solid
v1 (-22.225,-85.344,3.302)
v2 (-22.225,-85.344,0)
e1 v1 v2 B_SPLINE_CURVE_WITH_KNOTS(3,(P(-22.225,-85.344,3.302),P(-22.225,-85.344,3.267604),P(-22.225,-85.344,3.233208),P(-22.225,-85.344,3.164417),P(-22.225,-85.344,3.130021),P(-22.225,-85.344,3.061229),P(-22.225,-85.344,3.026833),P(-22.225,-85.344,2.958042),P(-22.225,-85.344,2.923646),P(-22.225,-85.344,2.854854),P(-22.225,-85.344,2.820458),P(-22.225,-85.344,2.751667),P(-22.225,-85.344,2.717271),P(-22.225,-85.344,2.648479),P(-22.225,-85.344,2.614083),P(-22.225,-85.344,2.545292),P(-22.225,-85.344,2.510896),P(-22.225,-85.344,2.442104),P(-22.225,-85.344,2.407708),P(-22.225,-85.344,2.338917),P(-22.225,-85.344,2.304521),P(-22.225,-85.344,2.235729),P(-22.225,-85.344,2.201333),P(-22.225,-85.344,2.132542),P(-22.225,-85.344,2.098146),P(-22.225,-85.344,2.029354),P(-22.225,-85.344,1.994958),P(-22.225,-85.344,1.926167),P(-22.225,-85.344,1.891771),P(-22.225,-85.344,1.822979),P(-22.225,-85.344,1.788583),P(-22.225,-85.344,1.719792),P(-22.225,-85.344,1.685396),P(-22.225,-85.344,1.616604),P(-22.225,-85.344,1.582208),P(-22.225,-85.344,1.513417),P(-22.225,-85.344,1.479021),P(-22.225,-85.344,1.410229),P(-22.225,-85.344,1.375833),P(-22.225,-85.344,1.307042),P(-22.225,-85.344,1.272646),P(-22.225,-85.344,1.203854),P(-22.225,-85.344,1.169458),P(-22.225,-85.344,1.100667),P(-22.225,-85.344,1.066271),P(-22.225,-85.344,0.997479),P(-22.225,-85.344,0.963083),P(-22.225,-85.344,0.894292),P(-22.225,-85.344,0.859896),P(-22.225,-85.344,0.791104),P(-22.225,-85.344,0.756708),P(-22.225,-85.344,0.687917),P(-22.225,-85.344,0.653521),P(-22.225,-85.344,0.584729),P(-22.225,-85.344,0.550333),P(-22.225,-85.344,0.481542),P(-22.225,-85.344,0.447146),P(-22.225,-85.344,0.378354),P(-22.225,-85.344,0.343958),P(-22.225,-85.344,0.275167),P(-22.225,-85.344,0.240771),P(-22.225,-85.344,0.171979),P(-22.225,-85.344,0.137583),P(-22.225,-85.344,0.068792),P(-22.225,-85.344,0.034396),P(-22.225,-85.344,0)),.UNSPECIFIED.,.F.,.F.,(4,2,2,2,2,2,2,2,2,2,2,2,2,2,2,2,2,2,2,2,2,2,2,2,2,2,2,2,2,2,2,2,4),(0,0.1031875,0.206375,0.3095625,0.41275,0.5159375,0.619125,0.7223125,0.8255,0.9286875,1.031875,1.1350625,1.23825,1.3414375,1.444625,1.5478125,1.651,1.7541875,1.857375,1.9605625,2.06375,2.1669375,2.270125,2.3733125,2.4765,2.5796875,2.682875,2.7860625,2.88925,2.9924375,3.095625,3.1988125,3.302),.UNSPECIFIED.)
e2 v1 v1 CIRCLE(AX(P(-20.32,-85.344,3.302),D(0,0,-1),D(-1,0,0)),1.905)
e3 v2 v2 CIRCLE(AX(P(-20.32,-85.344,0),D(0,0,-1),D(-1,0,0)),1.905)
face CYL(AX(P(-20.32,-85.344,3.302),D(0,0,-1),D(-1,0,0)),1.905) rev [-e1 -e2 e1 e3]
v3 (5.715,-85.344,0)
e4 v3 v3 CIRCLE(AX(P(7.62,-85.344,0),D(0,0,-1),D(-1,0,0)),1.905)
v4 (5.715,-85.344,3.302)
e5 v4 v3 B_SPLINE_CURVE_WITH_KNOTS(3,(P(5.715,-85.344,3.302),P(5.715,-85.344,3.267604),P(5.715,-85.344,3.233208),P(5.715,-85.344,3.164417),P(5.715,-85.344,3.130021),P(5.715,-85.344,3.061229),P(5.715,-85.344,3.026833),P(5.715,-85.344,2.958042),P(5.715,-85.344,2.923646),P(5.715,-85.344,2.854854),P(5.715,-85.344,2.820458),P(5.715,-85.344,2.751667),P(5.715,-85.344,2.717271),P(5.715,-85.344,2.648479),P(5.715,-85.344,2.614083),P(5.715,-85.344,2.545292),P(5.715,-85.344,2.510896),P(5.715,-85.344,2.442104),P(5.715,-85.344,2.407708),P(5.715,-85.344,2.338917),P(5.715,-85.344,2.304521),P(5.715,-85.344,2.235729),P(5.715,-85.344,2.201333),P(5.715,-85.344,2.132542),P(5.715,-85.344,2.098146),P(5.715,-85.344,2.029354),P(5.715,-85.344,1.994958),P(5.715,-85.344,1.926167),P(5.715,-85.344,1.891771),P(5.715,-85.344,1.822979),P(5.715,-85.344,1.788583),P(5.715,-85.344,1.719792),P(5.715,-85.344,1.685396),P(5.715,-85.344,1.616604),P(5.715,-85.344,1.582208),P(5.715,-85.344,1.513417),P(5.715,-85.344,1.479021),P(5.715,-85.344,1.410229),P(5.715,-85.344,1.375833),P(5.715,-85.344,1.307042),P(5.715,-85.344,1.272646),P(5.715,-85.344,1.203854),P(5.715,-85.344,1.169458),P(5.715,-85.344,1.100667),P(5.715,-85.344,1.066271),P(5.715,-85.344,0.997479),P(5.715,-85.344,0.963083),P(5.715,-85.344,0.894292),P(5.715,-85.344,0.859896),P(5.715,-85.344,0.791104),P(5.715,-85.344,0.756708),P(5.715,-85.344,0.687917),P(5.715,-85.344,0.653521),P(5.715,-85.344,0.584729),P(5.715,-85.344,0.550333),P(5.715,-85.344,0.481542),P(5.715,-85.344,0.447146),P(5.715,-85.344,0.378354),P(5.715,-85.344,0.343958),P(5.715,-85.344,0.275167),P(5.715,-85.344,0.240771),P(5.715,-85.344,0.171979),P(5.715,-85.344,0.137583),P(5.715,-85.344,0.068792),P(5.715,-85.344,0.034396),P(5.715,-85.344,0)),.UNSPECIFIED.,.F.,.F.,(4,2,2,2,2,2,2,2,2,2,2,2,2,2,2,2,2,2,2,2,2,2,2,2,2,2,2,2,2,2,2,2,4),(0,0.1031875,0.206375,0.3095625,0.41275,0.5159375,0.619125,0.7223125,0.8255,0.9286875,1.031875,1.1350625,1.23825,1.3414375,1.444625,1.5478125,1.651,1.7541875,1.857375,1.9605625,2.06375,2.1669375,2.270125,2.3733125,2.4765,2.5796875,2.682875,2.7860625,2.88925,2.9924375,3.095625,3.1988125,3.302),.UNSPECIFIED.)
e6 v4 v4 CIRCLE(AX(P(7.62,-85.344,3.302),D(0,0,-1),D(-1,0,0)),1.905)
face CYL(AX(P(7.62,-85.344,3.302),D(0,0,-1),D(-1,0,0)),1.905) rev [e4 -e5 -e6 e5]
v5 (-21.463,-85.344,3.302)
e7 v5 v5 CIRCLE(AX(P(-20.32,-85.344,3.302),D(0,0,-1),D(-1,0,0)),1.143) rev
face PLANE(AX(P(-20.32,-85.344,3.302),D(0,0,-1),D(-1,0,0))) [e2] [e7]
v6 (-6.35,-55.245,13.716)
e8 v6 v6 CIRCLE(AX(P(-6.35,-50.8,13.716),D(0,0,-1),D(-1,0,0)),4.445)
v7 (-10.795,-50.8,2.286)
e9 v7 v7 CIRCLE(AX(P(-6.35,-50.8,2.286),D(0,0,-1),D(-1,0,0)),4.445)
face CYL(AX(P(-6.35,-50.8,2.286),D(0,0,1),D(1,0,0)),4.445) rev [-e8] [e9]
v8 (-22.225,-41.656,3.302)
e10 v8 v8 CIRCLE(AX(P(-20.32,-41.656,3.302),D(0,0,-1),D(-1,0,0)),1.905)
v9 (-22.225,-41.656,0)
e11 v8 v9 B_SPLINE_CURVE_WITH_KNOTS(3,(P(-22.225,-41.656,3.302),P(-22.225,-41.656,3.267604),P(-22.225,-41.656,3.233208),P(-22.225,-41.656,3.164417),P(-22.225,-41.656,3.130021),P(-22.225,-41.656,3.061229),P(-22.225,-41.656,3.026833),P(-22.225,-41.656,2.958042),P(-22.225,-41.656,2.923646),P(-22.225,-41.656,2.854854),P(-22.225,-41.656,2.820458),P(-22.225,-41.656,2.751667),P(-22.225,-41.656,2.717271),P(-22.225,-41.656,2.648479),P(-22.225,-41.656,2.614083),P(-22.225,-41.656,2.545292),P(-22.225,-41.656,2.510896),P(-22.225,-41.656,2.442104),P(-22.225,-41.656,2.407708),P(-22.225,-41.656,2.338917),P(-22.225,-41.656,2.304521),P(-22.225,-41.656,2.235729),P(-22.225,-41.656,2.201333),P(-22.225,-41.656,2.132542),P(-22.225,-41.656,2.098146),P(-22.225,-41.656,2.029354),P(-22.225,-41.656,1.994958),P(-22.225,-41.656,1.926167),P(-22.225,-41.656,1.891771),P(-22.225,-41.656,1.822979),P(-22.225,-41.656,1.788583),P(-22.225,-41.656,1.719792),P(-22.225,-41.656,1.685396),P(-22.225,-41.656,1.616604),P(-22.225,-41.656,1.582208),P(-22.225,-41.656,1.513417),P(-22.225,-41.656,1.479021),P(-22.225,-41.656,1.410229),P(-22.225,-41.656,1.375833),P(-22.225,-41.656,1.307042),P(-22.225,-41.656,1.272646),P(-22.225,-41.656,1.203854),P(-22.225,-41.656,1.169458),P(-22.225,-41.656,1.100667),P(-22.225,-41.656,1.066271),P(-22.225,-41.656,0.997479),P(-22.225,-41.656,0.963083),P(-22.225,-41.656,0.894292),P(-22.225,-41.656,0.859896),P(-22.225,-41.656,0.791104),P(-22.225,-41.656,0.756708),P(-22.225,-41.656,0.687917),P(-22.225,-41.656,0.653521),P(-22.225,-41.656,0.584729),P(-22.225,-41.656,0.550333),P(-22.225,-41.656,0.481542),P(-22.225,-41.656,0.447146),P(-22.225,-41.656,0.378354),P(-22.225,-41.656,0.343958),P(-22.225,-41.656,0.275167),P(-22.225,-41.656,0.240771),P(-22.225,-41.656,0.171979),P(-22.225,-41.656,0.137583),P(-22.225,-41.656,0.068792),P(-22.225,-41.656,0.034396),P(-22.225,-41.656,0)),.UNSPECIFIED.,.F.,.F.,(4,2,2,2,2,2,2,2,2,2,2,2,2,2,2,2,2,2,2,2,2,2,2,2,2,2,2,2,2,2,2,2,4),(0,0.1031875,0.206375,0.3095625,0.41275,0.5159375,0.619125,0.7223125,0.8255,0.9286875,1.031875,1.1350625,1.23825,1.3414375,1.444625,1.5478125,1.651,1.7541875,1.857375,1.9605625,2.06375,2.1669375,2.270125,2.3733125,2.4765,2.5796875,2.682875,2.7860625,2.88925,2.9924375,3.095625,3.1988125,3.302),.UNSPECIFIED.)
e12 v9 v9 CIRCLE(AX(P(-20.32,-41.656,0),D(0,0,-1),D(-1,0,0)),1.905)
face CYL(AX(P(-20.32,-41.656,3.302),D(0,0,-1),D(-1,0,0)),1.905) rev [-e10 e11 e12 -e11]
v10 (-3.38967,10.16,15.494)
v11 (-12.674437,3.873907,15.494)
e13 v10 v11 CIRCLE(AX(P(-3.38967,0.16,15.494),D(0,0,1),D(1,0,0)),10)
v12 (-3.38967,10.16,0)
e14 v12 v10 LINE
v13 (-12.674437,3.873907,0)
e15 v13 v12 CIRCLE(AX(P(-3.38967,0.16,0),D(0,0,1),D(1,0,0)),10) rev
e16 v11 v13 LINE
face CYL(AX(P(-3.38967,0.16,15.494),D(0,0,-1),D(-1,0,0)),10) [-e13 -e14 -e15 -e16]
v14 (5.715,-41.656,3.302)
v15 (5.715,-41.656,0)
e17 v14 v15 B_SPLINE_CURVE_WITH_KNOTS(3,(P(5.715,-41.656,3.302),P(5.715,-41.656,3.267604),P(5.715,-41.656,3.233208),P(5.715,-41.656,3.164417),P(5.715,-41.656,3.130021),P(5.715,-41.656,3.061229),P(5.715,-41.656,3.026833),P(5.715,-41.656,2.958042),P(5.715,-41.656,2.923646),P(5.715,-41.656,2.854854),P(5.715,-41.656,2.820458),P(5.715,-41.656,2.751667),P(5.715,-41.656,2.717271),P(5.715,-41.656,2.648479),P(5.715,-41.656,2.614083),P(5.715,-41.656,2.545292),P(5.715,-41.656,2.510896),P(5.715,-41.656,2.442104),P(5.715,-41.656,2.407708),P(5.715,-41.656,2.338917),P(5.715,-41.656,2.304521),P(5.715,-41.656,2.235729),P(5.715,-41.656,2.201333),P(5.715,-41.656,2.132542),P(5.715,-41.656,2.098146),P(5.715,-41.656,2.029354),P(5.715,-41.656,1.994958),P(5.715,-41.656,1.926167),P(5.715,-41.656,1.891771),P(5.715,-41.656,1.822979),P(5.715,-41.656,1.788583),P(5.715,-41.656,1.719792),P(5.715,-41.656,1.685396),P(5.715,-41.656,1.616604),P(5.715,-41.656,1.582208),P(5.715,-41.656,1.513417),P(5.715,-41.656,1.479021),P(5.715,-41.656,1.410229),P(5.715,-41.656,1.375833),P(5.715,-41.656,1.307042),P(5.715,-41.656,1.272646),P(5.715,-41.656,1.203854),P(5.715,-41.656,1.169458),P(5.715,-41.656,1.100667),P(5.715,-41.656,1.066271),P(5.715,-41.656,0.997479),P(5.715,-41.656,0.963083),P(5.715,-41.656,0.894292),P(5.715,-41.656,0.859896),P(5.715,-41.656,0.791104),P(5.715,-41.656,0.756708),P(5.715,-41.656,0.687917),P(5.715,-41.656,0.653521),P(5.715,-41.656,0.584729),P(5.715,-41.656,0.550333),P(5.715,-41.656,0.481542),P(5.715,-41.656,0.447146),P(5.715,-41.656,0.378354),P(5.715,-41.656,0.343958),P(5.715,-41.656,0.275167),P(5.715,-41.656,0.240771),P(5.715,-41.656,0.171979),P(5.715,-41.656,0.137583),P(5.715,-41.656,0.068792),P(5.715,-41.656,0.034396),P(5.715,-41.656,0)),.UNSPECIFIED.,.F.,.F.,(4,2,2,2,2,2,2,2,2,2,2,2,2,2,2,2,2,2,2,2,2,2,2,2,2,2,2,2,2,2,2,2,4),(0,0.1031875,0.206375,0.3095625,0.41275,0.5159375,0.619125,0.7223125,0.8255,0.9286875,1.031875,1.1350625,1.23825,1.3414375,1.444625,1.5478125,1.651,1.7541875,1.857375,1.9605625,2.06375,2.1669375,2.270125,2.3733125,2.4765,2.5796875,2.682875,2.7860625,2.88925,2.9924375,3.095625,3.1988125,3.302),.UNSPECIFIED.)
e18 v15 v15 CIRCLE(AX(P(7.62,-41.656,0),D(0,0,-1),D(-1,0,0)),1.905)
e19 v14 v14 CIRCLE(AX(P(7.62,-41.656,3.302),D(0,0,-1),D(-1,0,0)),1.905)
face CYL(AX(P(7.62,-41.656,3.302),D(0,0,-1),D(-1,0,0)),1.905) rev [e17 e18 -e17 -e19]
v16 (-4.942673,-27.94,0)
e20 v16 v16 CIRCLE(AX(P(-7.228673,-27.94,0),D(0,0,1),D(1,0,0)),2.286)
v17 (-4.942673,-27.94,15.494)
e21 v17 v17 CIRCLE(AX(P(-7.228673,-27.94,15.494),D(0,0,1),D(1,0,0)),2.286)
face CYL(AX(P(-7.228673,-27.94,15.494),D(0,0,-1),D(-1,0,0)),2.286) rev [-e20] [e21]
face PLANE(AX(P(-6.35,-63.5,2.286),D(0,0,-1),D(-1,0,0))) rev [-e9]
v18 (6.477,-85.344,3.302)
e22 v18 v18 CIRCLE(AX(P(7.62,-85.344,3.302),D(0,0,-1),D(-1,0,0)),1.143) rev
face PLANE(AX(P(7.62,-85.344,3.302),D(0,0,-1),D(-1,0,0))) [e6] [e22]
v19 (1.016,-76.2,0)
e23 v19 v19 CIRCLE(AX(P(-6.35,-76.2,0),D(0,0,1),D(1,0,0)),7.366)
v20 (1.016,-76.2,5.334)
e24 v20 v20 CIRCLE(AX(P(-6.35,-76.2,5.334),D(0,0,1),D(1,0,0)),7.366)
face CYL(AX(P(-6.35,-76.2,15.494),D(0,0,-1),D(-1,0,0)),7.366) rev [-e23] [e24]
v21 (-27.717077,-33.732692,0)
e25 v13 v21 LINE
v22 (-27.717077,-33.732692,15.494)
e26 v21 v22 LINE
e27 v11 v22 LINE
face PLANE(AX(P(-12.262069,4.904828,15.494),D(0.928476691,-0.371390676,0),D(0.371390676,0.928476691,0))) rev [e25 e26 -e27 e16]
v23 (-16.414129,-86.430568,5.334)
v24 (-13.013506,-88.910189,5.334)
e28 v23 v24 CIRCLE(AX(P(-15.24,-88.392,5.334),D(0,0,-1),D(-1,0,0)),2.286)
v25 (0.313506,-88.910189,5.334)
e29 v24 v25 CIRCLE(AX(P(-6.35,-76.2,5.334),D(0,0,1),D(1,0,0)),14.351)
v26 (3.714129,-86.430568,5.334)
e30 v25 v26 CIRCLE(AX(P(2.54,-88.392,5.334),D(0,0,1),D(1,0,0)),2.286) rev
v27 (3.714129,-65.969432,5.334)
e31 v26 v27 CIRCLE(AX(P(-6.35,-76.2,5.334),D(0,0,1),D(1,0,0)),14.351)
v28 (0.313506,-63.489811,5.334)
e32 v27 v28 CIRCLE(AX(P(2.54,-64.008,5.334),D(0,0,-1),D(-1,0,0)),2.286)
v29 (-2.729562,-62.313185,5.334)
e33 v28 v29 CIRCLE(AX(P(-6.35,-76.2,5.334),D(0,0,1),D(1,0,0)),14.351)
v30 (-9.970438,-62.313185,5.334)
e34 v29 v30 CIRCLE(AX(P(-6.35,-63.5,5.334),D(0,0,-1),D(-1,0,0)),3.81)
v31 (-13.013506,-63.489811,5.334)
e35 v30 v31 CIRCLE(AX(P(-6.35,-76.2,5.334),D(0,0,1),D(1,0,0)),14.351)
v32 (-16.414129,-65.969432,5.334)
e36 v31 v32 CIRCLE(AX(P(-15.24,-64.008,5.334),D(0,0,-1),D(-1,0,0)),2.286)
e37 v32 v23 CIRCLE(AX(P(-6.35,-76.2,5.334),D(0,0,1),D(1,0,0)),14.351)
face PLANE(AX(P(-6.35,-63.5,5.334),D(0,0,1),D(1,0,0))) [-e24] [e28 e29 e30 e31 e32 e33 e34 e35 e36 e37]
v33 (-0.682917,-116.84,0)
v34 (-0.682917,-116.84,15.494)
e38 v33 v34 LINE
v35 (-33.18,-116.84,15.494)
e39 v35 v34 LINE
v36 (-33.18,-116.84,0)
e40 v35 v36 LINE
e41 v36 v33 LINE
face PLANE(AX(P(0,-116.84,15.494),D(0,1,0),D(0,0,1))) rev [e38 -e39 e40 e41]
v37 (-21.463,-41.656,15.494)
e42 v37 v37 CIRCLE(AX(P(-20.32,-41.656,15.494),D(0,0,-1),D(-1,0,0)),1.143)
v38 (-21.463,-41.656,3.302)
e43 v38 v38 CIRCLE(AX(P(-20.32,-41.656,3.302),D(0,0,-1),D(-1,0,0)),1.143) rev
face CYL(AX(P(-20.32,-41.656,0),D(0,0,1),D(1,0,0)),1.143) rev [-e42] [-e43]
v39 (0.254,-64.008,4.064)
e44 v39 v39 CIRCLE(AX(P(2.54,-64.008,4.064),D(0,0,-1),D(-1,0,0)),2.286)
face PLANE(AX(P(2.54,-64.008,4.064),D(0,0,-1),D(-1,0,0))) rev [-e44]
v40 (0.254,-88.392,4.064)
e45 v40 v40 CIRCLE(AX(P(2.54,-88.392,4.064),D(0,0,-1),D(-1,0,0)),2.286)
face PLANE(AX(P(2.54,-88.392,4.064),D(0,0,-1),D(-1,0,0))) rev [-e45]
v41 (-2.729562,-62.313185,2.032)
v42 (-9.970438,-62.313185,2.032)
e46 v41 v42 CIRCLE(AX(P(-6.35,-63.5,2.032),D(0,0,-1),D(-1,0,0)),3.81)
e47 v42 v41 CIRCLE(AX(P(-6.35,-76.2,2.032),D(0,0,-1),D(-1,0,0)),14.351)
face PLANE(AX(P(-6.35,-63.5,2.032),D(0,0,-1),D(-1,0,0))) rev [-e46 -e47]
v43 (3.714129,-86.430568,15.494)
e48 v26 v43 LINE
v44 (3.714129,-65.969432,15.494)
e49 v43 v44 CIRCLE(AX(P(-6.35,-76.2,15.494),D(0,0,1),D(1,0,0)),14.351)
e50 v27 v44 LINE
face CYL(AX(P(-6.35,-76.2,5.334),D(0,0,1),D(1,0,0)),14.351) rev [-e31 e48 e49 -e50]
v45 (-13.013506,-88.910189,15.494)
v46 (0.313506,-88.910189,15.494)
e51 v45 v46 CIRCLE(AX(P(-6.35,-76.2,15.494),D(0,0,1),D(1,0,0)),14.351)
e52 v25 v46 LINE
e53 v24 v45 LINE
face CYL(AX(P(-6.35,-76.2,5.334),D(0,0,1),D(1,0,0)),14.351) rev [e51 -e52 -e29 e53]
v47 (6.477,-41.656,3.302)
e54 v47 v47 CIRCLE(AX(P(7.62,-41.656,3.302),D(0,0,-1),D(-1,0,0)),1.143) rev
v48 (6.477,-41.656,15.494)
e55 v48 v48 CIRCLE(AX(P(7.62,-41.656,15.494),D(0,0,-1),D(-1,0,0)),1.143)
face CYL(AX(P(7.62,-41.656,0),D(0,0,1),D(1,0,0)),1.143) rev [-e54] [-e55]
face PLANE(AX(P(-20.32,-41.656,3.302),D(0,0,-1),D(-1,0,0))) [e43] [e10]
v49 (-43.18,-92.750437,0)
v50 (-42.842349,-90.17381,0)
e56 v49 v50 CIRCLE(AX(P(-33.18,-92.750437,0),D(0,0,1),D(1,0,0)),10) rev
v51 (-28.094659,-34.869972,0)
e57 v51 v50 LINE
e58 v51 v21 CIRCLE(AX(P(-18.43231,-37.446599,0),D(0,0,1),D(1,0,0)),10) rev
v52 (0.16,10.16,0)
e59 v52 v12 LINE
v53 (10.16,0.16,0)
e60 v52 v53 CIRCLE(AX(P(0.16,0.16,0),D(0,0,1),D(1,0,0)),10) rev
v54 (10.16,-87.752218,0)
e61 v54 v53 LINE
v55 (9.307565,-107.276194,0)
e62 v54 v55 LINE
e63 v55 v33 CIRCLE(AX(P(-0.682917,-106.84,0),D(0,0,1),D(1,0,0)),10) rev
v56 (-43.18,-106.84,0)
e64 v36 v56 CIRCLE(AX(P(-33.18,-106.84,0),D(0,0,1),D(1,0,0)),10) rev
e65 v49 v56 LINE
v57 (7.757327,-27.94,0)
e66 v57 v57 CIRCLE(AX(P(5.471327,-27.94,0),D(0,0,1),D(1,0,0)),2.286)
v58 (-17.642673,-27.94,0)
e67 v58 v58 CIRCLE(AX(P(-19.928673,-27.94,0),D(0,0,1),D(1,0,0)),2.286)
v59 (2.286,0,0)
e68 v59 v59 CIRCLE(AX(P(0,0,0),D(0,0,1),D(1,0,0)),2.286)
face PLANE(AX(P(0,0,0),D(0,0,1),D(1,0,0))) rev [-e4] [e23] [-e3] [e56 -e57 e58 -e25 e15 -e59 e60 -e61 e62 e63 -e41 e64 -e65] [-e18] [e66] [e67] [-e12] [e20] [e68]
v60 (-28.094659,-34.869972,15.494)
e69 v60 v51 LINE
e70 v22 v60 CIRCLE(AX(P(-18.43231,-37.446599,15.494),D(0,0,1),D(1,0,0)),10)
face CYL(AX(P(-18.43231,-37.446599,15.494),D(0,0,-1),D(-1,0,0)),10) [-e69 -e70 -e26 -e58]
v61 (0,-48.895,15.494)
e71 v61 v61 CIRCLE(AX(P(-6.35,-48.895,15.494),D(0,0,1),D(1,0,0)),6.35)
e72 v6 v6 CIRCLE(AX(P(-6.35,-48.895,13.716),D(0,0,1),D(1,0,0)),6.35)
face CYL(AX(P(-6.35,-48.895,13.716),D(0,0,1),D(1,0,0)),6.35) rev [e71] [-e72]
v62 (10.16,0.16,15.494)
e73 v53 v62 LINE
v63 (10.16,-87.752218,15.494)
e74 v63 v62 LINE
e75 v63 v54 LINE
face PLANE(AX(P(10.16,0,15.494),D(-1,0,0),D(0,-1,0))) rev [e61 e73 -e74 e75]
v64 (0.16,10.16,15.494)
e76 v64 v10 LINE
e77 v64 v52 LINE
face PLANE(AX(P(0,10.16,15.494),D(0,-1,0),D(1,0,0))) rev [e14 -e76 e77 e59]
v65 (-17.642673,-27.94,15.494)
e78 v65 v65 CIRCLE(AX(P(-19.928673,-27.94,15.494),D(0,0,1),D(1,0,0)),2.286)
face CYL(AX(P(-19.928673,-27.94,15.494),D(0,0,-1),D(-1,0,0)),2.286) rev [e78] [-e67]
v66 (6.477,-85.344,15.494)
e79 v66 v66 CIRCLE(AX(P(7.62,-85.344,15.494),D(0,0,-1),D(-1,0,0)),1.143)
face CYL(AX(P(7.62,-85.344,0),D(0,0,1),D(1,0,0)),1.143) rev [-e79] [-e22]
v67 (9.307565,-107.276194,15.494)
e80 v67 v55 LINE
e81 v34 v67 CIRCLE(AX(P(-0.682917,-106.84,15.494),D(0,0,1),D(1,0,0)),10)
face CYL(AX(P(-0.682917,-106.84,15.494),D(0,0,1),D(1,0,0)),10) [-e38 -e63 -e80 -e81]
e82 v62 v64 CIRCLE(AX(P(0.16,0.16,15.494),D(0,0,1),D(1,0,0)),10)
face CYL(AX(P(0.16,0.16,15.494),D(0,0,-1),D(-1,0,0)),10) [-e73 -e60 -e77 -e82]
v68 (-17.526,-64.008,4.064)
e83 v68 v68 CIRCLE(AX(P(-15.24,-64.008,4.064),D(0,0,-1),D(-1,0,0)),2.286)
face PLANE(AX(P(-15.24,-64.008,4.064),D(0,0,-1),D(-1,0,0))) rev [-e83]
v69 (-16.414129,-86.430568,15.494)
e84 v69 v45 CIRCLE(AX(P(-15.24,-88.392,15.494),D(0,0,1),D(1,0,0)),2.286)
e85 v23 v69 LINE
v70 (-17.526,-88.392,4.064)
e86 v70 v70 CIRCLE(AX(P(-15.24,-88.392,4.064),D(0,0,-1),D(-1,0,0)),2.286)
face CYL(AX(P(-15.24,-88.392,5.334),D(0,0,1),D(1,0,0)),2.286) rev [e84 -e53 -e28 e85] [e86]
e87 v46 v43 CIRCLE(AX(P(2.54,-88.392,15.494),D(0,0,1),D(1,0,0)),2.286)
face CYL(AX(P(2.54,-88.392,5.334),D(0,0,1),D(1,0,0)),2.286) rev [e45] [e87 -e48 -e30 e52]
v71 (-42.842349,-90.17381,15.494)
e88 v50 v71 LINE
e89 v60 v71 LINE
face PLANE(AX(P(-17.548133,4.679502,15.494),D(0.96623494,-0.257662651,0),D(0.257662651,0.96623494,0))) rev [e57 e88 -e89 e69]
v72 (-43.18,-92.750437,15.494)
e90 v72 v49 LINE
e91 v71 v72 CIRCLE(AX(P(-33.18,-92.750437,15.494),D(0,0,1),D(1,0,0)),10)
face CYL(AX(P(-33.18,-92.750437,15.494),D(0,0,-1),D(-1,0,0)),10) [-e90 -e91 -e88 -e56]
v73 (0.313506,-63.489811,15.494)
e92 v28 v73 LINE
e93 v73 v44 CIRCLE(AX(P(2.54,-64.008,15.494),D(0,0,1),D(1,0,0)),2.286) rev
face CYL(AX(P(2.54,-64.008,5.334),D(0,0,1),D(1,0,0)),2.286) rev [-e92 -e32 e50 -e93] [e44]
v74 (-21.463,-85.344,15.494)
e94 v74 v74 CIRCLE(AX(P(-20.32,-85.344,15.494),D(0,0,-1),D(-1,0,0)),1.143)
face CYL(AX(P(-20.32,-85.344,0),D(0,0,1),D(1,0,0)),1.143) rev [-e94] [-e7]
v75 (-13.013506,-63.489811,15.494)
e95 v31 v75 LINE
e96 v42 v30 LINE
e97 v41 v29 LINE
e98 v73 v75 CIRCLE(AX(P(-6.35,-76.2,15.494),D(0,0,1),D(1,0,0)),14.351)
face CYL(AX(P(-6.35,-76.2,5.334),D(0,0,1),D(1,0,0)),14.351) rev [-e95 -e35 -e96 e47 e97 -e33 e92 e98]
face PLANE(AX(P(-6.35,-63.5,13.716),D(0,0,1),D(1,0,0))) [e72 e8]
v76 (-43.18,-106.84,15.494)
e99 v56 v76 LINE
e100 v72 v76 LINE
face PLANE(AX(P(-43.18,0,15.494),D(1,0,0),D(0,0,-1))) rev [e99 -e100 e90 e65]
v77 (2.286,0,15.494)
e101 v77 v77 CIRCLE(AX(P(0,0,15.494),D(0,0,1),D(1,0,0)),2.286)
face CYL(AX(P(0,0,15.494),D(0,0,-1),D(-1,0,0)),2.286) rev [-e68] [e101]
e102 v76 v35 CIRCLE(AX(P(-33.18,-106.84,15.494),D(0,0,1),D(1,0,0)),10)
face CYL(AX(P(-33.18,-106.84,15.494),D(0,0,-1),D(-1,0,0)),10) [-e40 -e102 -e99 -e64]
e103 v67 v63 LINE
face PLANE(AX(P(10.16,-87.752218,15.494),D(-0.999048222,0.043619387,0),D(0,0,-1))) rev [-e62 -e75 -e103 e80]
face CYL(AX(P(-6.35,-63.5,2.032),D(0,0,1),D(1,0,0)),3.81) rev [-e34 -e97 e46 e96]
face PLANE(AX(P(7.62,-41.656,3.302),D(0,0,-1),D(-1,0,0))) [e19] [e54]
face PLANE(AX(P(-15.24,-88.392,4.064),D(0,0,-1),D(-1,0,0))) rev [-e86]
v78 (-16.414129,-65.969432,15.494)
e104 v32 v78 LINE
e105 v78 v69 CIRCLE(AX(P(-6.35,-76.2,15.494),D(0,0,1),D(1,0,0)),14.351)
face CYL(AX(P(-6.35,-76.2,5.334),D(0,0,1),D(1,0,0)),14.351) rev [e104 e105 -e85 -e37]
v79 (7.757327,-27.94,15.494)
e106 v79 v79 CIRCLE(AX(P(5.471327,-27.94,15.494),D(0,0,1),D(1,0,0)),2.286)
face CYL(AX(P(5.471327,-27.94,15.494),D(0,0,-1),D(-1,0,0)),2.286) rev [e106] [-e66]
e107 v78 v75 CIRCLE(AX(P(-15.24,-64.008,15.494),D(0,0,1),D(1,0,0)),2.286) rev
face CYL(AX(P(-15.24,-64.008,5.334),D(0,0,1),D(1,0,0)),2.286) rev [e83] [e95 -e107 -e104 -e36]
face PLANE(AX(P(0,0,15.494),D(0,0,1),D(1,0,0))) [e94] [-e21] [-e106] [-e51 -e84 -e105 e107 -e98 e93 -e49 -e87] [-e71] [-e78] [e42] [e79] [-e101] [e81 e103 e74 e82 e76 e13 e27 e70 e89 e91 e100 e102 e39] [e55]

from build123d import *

# Parameters (mm, degrees)
SKETCH1_R             = 2.286
SKETCH1_R_2           = 7.366
BOSS_EXTRUDE1_DEPTH   = 15.494
CAVITY1_START         = 5.334
CAVITY1_OUTLINE_R     = 1.143
CAVITY1_OUTLINE_R_2   = 7.366
CAVITY1_OUTLINE_R_3   = 4.445
CAVITY1_DEPTH         = 10.16
CAVITY1_START_2       = 2.286
CAVITY1_2_OUTLINE_R   = 1.143
CAVITY1_2_OUTLINE_R_2 = 4.445
CAVITY1_2_DEPTH       = 3.048
CAVITY1_3_OUTLINE_R   = 1.905
CAVITY1_3_DEPTH       = 3.302
CAVITY1_START_3       = 13.716
CAVITY1_4_DEPTH       = 1.778
CAVITY1_START_4       = 4.064
CAVITY1_5_OUTLINE_R   = 2.286
CAVITY1_5_DEPTH       = 1.27
CAVITY1_START_5       = 2.032
CAVITY1_6_DEPTH       = 0.254
CHAMFER1_SIZE         = 1.27
CHAMFER1_SIZE2        = 29.087782247
FILLET1_R             = 10


# Read off the part's stored shape, not the designer's step: Cavity1
with BuildPart() as part:
    # Sketch1 → Boss-Extrude1 (new body)
    with BuildSketch(Plane.XY):
        Polygon((-10.16, 10.16), (-27.94, -34.29), (-43.18, -91.44), (-43.18, -116.84), (10.16, -116.84), (10.16, 10.16), align=None)
        Circle(SKETCH1_R, mode=Mode.SUBTRACT)
        with Locations((-6.35, -76.2)):
            Circle(SKETCH1_R_2, mode=Mode.SUBTRACT)
        with Locations((-7.228672556, -27.94)):
            Circle(SKETCH1_R, mode=Mode.SUBTRACT)
        with Locations((-19.928672556, -27.94)):
            Circle(SKETCH1_R, mode=Mode.SUBTRACT)
        with Locations((5.471327444, -27.94)):
            Circle(SKETCH1_R, mode=Mode.SUBTRACT)
    extrude(amount=BOSS_EXTRUDE1_DEPTH)

    # Cavity1 outline → Cavity1 (cut)
    # profile 1 of 6: a face of its own
    with BuildSketch(Plane.XY.offset(CAVITY1_START)):
        with Locations((7.62, -85.344)):
            Circle(CAVITY1_OUTLINE_R)
    # profile 2 of 6: a face of its own
    with BuildSketch(Plane.XY.offset(CAVITY1_START)):
        with BuildLine():
            ThreePointArc((3.714128852, -86.430567503), (8.001, -76.2), (3.714128852, -65.969432496))
            ThreePointArc((3.714128852, -65.969432496), (3.886847552, -62.160894786), (0.313505747, -63.489811482))
            ThreePointArc((0.313505747, -63.489811482), (-6.35, -61.849), (-13.013505747, -63.489811482))
            ThreePointArc((-13.013505747, -63.489811482), (-16.586847552, -62.160894786), (-16.414128852, -65.969432496))
            ThreePointArc((-16.414128852, -65.969432496), (-20.701, -76.2), (-16.414128852, -86.430567503))
            ThreePointArc((-16.414128852, -86.430567503), (-16.586847552, -90.239105214), (-13.013505747, -88.910188518))
            ThreePointArc((-13.013505747, -88.910188518), (-6.35, -90.551), (0.313505747, -88.910188518))
            ThreePointArc((0.313505747, -88.910188518), (3.886847552, -90.239105214), (3.714128852, -86.430567503))
        make_face()
        with Locations((-6.35, -76.2)):
            Circle(CAVITY1_OUTLINE_R_2, mode=Mode.SUBTRACT)
    # profile 3 of 6: a face of its own
    with BuildSketch(Plane.XY.offset(CAVITY1_START)):
        with Locations((7.62, -41.656)):
            Circle(CAVITY1_OUTLINE_R)
    # profile 4 of 6: a face of its own
    with BuildSketch(Plane.XY.offset(CAVITY1_START)):
        with Locations((-6.35, -50.8)):
            Circle(CAVITY1_OUTLINE_R_3)
    # profile 5 of 6: a face of its own
    with BuildSketch(Plane.XY.offset(CAVITY1_START)):
        with Locations((-20.32, -85.344)):
            Circle(CAVITY1_OUTLINE_R)
    # profile 6 of 6: a face of its own
    with BuildSketch(Plane.XY.offset(CAVITY1_START)):
        with Locations((-20.32, -41.656)):
            Circle(CAVITY1_OUTLINE_R)
    extrude(amount=CAVITY1_DEPTH, mode=Mode.SUBTRACT)

    # Cavity1 2 outline → Cavity1 2 (cut)
    with BuildSketch(Plane.XY.offset(CAVITY1_START_2)):
        with Locations((7.62, -85.344)):
            Circle(CAVITY1_2_OUTLINE_R)
        with Locations((7.62, -41.656)):
            Circle(CAVITY1_2_OUTLINE_R)
        with BuildLine():
            ThreePointArc((-9.97043784, -62.313185), (-6.35, -67.31), (-2.72956216, -62.313185))
            ThreePointArc((-2.72956216, -62.313185), (-6.35, -61.849), (-9.97043784, -62.313185))
        make_face()
        with Locations((-6.35, -50.8)):
            Circle(CAVITY1_2_OUTLINE_R_2)
        with Locations((-20.32, -85.344)):
            Circle(CAVITY1_2_OUTLINE_R)
        with Locations((-20.32, -41.656)):
            Circle(CAVITY1_2_OUTLINE_R)
    extrude(amount=CAVITY1_2_DEPTH, mode=Mode.SUBTRACT)

    # Cavity1 3 outline → Cavity1 3 (cut)
    with BuildSketch(Plane.XY):
        with Locations((7.62, -85.344)):
            Circle(CAVITY1_3_OUTLINE_R)
        with Locations((7.62, -41.656)):
            Circle(CAVITY1_3_OUTLINE_R)
        with Locations((-20.32, -85.344)):
            Circle(CAVITY1_3_OUTLINE_R)
        with Locations((-20.32, -41.656)):
            Circle(CAVITY1_3_OUTLINE_R)
    extrude(amount=CAVITY1_3_DEPTH, mode=Mode.SUBTRACT)

    # Cavity1 4 outline → Cavity1 4 (cut)
    with BuildSketch(Plane.XY.offset(CAVITY1_START_3)):
        with BuildLine():
            Line((-2.021487251, -51.810941334), (-0.080238237, -49.901274035))
            ThreePointArc((-0.080238237, -49.901274035), (-0.020091344, -49.399733991), (0, -48.895))
            ThreePointArc((0, -48.895), (-0.99932539, -45.475529103), (-3.682765738, -43.132330359))
            Line((-3.682765738, -43.132330359), (-4.827346661, -46.623931058))
            ThreePointArc((-4.827346661, -46.623931058), (-2.708144766, -48.2514876), (-1.905, -50.8))
            ThreePointArc((-1.905, -50.8), (-1.93421784, -51.308815207), (-2.021487251, -51.810941334))
        make_face()
        with BuildLine():
            ThreePointArc((-5.088099029, -55.118351664), (-1.768956382, -53.292333211), (-0.080238237, -49.901274035))
            Line((-0.080238237, -49.901274035), (-2.021487251, -51.810941334))
            ThreePointArc((-2.021487251, -51.810941334), (-3.122489186, -53.856337505), (-5.104913564, -55.067058093))
            Line((-5.104913564, -55.067058093), (-5.088099029, -55.118351664))
        make_face()
        with BuildLine():
            Line((-4.827346661, -46.623931058), (-3.682765738, -43.132330359))
            ThreePointArc((-3.682765738, -43.132330359), (-6.35, -42.545), (-9.017234262, -43.132330359))
            Line((-9.017234262, -43.132330359), (-7.872653339, -46.623931058))
            ThreePointArc((-7.872653339, -46.623931058), (-6.35, -46.355), (-4.827346661, -46.623931058))
        make_face()
        with BuildLine():
            ThreePointArc((-5.446692173, -55.180422418), (-5.266950842, -55.15195649), (-5.088099029, -55.118351664))
            Line((-5.088099029, -55.118351664), (-5.104913564, -55.067058093))
            ThreePointArc((-5.104913564, -55.067058093), (-5.256864048, -55.108489154), (-5.410186924, -55.144511064))
            Line((-5.410186924, -55.144511064), (-5.446692173, -55.180422418))
        make_face()
        with BuildLine():
            Line((-7.872653339, -46.623931058), (-9.017234262, -43.132330359))
            ThreePointArc((-9.017234262, -43.132330359), (-11.955544051, -45.911650223), (-12.619761763, -49.901274035))
            Line((-12.619761763, -49.901274035), (-10.678512749, -51.810941334))
            ThreePointArc((-10.678512749, -51.810941334), (-10.259642573, -48.6851194), (-7.872653339, -46.623931058))
        make_face()
        with BuildLine():
            ThreePointArc((-6.35, -55.245), (-5.897193393, -55.228835029), (-5.446692173, -55.180422418))
            Line((-5.446692173, -55.180422418), (-5.410186924, -55.144511064))
            ThreePointArc((-5.410186924, -55.144511064), (-5.877414917, -55.219806369), (-6.35, -55.245))
        make_face()
        with BuildLine():
            Line((-7.289813076, -55.144511064), (-7.253307826, -55.180422418))
            ThreePointArc((-7.253307826, -55.180422418), (-6.802806607, -55.228835029), (-6.35, -55.245))
            ThreePointArc((-6.35, -55.245), (-6.822585083, -55.219806369), (-7.289813076, -55.144511064))
        make_face()
        with BuildLine():
            ThreePointArc((-7.611900971, -55.118351664), (-7.433049158, -55.15195649), (-7.253307826, -55.180422418))
            Line((-7.253307826, -55.180422418), (-7.289813076, -55.144511064))
            ThreePointArc((-7.289813076, -55.144511064), (-7.443135952, -55.108489154), (-7.595086436, -55.067058093))
            Line((-7.595086436, -55.067058093), (-7.611900971, -55.118351664))
        make_face()
        with BuildLine():
            Line((-10.678512749, -51.810941334), (-12.619761763, -49.901274035))
            ThreePointArc((-12.619761763, -49.901274035), (-10.931043618, -53.292333211), (-7.611900971, -55.118351664))
            Line((-7.611900971, -55.118351664), (-7.595086436, -55.067058093))
            ThreePointArc((-7.595086436, -55.067058093), (-9.577510814, -53.856337505), (-10.678512749, -51.810941334))
        make_face()
    extrude(amount=CAVITY1_4_DEPTH, mode=Mode.SUBTRACT)

    # Cavity1 5 outline → Cavity1 5 (cut)
    with BuildSketch(Plane.XY.offset(CAVITY1_START_4)):
        with Locations((2.54, -88.392)):
            Circle(CAVITY1_5_OUTLINE_R)
        with Locations((2.54, -64.008)):
            Circle(CAVITY1_5_OUTLINE_R)
        with Locations((-15.24, -88.392)):
            Circle(CAVITY1_5_OUTLINE_R)
        with Locations((-15.24, -64.008)):
            Circle(CAVITY1_5_OUTLINE_R)
    extrude(amount=CAVITY1_5_DEPTH, mode=Mode.SUBTRACT)

    # Cavity1 6 outline → Cavity1 6 (cut)
    with BuildSketch(Plane.XY.offset(CAVITY1_START_5)):
        with BuildLine():
            ThreePointArc((-9.97043784, -62.313185), (-6.35, -67.31), (-2.72956216, -62.313185))
            ThreePointArc((-2.72956216, -62.313185), (-6.35, -61.849), (-9.97043784, -62.313185))
        make_face()
    extrude(amount=CAVITY1_6_DEPTH, mode=Mode.SUBTRACT)

    # Chamfer1
    chamfer1_edges = [part.edges().sort_by_distance(p)[0] for p in [
        (10.16, -116.84, 7.747),
    ]]
    chamfer1_side = [part.faces().sort_by_distance(p)[0] for p in [
        (-16.51, -116.84, 7.747),
    ]]
    chamfer(chamfer1_edges, length=CHAMFER1_SIZE, length2=CHAMFER1_SIZE2, reference=chamfer1_side[0])

    # Fillet1
    fillet1_edges = [part.edges().sort_by_distance(p)[0] for p in [
        (-10.16, 10.16, 7.747),
        (10.16, 10.16, 7.747),
        (8.89, -116.84, 7.747),
        (-43.18, -116.84, 7.747),
        (-43.18, -91.44, 7.747),
        (-27.94, -34.29, 7.747),
    ]]
    fillet(fillet1_edges, radius=FILLET1_R)


solid = part.part
